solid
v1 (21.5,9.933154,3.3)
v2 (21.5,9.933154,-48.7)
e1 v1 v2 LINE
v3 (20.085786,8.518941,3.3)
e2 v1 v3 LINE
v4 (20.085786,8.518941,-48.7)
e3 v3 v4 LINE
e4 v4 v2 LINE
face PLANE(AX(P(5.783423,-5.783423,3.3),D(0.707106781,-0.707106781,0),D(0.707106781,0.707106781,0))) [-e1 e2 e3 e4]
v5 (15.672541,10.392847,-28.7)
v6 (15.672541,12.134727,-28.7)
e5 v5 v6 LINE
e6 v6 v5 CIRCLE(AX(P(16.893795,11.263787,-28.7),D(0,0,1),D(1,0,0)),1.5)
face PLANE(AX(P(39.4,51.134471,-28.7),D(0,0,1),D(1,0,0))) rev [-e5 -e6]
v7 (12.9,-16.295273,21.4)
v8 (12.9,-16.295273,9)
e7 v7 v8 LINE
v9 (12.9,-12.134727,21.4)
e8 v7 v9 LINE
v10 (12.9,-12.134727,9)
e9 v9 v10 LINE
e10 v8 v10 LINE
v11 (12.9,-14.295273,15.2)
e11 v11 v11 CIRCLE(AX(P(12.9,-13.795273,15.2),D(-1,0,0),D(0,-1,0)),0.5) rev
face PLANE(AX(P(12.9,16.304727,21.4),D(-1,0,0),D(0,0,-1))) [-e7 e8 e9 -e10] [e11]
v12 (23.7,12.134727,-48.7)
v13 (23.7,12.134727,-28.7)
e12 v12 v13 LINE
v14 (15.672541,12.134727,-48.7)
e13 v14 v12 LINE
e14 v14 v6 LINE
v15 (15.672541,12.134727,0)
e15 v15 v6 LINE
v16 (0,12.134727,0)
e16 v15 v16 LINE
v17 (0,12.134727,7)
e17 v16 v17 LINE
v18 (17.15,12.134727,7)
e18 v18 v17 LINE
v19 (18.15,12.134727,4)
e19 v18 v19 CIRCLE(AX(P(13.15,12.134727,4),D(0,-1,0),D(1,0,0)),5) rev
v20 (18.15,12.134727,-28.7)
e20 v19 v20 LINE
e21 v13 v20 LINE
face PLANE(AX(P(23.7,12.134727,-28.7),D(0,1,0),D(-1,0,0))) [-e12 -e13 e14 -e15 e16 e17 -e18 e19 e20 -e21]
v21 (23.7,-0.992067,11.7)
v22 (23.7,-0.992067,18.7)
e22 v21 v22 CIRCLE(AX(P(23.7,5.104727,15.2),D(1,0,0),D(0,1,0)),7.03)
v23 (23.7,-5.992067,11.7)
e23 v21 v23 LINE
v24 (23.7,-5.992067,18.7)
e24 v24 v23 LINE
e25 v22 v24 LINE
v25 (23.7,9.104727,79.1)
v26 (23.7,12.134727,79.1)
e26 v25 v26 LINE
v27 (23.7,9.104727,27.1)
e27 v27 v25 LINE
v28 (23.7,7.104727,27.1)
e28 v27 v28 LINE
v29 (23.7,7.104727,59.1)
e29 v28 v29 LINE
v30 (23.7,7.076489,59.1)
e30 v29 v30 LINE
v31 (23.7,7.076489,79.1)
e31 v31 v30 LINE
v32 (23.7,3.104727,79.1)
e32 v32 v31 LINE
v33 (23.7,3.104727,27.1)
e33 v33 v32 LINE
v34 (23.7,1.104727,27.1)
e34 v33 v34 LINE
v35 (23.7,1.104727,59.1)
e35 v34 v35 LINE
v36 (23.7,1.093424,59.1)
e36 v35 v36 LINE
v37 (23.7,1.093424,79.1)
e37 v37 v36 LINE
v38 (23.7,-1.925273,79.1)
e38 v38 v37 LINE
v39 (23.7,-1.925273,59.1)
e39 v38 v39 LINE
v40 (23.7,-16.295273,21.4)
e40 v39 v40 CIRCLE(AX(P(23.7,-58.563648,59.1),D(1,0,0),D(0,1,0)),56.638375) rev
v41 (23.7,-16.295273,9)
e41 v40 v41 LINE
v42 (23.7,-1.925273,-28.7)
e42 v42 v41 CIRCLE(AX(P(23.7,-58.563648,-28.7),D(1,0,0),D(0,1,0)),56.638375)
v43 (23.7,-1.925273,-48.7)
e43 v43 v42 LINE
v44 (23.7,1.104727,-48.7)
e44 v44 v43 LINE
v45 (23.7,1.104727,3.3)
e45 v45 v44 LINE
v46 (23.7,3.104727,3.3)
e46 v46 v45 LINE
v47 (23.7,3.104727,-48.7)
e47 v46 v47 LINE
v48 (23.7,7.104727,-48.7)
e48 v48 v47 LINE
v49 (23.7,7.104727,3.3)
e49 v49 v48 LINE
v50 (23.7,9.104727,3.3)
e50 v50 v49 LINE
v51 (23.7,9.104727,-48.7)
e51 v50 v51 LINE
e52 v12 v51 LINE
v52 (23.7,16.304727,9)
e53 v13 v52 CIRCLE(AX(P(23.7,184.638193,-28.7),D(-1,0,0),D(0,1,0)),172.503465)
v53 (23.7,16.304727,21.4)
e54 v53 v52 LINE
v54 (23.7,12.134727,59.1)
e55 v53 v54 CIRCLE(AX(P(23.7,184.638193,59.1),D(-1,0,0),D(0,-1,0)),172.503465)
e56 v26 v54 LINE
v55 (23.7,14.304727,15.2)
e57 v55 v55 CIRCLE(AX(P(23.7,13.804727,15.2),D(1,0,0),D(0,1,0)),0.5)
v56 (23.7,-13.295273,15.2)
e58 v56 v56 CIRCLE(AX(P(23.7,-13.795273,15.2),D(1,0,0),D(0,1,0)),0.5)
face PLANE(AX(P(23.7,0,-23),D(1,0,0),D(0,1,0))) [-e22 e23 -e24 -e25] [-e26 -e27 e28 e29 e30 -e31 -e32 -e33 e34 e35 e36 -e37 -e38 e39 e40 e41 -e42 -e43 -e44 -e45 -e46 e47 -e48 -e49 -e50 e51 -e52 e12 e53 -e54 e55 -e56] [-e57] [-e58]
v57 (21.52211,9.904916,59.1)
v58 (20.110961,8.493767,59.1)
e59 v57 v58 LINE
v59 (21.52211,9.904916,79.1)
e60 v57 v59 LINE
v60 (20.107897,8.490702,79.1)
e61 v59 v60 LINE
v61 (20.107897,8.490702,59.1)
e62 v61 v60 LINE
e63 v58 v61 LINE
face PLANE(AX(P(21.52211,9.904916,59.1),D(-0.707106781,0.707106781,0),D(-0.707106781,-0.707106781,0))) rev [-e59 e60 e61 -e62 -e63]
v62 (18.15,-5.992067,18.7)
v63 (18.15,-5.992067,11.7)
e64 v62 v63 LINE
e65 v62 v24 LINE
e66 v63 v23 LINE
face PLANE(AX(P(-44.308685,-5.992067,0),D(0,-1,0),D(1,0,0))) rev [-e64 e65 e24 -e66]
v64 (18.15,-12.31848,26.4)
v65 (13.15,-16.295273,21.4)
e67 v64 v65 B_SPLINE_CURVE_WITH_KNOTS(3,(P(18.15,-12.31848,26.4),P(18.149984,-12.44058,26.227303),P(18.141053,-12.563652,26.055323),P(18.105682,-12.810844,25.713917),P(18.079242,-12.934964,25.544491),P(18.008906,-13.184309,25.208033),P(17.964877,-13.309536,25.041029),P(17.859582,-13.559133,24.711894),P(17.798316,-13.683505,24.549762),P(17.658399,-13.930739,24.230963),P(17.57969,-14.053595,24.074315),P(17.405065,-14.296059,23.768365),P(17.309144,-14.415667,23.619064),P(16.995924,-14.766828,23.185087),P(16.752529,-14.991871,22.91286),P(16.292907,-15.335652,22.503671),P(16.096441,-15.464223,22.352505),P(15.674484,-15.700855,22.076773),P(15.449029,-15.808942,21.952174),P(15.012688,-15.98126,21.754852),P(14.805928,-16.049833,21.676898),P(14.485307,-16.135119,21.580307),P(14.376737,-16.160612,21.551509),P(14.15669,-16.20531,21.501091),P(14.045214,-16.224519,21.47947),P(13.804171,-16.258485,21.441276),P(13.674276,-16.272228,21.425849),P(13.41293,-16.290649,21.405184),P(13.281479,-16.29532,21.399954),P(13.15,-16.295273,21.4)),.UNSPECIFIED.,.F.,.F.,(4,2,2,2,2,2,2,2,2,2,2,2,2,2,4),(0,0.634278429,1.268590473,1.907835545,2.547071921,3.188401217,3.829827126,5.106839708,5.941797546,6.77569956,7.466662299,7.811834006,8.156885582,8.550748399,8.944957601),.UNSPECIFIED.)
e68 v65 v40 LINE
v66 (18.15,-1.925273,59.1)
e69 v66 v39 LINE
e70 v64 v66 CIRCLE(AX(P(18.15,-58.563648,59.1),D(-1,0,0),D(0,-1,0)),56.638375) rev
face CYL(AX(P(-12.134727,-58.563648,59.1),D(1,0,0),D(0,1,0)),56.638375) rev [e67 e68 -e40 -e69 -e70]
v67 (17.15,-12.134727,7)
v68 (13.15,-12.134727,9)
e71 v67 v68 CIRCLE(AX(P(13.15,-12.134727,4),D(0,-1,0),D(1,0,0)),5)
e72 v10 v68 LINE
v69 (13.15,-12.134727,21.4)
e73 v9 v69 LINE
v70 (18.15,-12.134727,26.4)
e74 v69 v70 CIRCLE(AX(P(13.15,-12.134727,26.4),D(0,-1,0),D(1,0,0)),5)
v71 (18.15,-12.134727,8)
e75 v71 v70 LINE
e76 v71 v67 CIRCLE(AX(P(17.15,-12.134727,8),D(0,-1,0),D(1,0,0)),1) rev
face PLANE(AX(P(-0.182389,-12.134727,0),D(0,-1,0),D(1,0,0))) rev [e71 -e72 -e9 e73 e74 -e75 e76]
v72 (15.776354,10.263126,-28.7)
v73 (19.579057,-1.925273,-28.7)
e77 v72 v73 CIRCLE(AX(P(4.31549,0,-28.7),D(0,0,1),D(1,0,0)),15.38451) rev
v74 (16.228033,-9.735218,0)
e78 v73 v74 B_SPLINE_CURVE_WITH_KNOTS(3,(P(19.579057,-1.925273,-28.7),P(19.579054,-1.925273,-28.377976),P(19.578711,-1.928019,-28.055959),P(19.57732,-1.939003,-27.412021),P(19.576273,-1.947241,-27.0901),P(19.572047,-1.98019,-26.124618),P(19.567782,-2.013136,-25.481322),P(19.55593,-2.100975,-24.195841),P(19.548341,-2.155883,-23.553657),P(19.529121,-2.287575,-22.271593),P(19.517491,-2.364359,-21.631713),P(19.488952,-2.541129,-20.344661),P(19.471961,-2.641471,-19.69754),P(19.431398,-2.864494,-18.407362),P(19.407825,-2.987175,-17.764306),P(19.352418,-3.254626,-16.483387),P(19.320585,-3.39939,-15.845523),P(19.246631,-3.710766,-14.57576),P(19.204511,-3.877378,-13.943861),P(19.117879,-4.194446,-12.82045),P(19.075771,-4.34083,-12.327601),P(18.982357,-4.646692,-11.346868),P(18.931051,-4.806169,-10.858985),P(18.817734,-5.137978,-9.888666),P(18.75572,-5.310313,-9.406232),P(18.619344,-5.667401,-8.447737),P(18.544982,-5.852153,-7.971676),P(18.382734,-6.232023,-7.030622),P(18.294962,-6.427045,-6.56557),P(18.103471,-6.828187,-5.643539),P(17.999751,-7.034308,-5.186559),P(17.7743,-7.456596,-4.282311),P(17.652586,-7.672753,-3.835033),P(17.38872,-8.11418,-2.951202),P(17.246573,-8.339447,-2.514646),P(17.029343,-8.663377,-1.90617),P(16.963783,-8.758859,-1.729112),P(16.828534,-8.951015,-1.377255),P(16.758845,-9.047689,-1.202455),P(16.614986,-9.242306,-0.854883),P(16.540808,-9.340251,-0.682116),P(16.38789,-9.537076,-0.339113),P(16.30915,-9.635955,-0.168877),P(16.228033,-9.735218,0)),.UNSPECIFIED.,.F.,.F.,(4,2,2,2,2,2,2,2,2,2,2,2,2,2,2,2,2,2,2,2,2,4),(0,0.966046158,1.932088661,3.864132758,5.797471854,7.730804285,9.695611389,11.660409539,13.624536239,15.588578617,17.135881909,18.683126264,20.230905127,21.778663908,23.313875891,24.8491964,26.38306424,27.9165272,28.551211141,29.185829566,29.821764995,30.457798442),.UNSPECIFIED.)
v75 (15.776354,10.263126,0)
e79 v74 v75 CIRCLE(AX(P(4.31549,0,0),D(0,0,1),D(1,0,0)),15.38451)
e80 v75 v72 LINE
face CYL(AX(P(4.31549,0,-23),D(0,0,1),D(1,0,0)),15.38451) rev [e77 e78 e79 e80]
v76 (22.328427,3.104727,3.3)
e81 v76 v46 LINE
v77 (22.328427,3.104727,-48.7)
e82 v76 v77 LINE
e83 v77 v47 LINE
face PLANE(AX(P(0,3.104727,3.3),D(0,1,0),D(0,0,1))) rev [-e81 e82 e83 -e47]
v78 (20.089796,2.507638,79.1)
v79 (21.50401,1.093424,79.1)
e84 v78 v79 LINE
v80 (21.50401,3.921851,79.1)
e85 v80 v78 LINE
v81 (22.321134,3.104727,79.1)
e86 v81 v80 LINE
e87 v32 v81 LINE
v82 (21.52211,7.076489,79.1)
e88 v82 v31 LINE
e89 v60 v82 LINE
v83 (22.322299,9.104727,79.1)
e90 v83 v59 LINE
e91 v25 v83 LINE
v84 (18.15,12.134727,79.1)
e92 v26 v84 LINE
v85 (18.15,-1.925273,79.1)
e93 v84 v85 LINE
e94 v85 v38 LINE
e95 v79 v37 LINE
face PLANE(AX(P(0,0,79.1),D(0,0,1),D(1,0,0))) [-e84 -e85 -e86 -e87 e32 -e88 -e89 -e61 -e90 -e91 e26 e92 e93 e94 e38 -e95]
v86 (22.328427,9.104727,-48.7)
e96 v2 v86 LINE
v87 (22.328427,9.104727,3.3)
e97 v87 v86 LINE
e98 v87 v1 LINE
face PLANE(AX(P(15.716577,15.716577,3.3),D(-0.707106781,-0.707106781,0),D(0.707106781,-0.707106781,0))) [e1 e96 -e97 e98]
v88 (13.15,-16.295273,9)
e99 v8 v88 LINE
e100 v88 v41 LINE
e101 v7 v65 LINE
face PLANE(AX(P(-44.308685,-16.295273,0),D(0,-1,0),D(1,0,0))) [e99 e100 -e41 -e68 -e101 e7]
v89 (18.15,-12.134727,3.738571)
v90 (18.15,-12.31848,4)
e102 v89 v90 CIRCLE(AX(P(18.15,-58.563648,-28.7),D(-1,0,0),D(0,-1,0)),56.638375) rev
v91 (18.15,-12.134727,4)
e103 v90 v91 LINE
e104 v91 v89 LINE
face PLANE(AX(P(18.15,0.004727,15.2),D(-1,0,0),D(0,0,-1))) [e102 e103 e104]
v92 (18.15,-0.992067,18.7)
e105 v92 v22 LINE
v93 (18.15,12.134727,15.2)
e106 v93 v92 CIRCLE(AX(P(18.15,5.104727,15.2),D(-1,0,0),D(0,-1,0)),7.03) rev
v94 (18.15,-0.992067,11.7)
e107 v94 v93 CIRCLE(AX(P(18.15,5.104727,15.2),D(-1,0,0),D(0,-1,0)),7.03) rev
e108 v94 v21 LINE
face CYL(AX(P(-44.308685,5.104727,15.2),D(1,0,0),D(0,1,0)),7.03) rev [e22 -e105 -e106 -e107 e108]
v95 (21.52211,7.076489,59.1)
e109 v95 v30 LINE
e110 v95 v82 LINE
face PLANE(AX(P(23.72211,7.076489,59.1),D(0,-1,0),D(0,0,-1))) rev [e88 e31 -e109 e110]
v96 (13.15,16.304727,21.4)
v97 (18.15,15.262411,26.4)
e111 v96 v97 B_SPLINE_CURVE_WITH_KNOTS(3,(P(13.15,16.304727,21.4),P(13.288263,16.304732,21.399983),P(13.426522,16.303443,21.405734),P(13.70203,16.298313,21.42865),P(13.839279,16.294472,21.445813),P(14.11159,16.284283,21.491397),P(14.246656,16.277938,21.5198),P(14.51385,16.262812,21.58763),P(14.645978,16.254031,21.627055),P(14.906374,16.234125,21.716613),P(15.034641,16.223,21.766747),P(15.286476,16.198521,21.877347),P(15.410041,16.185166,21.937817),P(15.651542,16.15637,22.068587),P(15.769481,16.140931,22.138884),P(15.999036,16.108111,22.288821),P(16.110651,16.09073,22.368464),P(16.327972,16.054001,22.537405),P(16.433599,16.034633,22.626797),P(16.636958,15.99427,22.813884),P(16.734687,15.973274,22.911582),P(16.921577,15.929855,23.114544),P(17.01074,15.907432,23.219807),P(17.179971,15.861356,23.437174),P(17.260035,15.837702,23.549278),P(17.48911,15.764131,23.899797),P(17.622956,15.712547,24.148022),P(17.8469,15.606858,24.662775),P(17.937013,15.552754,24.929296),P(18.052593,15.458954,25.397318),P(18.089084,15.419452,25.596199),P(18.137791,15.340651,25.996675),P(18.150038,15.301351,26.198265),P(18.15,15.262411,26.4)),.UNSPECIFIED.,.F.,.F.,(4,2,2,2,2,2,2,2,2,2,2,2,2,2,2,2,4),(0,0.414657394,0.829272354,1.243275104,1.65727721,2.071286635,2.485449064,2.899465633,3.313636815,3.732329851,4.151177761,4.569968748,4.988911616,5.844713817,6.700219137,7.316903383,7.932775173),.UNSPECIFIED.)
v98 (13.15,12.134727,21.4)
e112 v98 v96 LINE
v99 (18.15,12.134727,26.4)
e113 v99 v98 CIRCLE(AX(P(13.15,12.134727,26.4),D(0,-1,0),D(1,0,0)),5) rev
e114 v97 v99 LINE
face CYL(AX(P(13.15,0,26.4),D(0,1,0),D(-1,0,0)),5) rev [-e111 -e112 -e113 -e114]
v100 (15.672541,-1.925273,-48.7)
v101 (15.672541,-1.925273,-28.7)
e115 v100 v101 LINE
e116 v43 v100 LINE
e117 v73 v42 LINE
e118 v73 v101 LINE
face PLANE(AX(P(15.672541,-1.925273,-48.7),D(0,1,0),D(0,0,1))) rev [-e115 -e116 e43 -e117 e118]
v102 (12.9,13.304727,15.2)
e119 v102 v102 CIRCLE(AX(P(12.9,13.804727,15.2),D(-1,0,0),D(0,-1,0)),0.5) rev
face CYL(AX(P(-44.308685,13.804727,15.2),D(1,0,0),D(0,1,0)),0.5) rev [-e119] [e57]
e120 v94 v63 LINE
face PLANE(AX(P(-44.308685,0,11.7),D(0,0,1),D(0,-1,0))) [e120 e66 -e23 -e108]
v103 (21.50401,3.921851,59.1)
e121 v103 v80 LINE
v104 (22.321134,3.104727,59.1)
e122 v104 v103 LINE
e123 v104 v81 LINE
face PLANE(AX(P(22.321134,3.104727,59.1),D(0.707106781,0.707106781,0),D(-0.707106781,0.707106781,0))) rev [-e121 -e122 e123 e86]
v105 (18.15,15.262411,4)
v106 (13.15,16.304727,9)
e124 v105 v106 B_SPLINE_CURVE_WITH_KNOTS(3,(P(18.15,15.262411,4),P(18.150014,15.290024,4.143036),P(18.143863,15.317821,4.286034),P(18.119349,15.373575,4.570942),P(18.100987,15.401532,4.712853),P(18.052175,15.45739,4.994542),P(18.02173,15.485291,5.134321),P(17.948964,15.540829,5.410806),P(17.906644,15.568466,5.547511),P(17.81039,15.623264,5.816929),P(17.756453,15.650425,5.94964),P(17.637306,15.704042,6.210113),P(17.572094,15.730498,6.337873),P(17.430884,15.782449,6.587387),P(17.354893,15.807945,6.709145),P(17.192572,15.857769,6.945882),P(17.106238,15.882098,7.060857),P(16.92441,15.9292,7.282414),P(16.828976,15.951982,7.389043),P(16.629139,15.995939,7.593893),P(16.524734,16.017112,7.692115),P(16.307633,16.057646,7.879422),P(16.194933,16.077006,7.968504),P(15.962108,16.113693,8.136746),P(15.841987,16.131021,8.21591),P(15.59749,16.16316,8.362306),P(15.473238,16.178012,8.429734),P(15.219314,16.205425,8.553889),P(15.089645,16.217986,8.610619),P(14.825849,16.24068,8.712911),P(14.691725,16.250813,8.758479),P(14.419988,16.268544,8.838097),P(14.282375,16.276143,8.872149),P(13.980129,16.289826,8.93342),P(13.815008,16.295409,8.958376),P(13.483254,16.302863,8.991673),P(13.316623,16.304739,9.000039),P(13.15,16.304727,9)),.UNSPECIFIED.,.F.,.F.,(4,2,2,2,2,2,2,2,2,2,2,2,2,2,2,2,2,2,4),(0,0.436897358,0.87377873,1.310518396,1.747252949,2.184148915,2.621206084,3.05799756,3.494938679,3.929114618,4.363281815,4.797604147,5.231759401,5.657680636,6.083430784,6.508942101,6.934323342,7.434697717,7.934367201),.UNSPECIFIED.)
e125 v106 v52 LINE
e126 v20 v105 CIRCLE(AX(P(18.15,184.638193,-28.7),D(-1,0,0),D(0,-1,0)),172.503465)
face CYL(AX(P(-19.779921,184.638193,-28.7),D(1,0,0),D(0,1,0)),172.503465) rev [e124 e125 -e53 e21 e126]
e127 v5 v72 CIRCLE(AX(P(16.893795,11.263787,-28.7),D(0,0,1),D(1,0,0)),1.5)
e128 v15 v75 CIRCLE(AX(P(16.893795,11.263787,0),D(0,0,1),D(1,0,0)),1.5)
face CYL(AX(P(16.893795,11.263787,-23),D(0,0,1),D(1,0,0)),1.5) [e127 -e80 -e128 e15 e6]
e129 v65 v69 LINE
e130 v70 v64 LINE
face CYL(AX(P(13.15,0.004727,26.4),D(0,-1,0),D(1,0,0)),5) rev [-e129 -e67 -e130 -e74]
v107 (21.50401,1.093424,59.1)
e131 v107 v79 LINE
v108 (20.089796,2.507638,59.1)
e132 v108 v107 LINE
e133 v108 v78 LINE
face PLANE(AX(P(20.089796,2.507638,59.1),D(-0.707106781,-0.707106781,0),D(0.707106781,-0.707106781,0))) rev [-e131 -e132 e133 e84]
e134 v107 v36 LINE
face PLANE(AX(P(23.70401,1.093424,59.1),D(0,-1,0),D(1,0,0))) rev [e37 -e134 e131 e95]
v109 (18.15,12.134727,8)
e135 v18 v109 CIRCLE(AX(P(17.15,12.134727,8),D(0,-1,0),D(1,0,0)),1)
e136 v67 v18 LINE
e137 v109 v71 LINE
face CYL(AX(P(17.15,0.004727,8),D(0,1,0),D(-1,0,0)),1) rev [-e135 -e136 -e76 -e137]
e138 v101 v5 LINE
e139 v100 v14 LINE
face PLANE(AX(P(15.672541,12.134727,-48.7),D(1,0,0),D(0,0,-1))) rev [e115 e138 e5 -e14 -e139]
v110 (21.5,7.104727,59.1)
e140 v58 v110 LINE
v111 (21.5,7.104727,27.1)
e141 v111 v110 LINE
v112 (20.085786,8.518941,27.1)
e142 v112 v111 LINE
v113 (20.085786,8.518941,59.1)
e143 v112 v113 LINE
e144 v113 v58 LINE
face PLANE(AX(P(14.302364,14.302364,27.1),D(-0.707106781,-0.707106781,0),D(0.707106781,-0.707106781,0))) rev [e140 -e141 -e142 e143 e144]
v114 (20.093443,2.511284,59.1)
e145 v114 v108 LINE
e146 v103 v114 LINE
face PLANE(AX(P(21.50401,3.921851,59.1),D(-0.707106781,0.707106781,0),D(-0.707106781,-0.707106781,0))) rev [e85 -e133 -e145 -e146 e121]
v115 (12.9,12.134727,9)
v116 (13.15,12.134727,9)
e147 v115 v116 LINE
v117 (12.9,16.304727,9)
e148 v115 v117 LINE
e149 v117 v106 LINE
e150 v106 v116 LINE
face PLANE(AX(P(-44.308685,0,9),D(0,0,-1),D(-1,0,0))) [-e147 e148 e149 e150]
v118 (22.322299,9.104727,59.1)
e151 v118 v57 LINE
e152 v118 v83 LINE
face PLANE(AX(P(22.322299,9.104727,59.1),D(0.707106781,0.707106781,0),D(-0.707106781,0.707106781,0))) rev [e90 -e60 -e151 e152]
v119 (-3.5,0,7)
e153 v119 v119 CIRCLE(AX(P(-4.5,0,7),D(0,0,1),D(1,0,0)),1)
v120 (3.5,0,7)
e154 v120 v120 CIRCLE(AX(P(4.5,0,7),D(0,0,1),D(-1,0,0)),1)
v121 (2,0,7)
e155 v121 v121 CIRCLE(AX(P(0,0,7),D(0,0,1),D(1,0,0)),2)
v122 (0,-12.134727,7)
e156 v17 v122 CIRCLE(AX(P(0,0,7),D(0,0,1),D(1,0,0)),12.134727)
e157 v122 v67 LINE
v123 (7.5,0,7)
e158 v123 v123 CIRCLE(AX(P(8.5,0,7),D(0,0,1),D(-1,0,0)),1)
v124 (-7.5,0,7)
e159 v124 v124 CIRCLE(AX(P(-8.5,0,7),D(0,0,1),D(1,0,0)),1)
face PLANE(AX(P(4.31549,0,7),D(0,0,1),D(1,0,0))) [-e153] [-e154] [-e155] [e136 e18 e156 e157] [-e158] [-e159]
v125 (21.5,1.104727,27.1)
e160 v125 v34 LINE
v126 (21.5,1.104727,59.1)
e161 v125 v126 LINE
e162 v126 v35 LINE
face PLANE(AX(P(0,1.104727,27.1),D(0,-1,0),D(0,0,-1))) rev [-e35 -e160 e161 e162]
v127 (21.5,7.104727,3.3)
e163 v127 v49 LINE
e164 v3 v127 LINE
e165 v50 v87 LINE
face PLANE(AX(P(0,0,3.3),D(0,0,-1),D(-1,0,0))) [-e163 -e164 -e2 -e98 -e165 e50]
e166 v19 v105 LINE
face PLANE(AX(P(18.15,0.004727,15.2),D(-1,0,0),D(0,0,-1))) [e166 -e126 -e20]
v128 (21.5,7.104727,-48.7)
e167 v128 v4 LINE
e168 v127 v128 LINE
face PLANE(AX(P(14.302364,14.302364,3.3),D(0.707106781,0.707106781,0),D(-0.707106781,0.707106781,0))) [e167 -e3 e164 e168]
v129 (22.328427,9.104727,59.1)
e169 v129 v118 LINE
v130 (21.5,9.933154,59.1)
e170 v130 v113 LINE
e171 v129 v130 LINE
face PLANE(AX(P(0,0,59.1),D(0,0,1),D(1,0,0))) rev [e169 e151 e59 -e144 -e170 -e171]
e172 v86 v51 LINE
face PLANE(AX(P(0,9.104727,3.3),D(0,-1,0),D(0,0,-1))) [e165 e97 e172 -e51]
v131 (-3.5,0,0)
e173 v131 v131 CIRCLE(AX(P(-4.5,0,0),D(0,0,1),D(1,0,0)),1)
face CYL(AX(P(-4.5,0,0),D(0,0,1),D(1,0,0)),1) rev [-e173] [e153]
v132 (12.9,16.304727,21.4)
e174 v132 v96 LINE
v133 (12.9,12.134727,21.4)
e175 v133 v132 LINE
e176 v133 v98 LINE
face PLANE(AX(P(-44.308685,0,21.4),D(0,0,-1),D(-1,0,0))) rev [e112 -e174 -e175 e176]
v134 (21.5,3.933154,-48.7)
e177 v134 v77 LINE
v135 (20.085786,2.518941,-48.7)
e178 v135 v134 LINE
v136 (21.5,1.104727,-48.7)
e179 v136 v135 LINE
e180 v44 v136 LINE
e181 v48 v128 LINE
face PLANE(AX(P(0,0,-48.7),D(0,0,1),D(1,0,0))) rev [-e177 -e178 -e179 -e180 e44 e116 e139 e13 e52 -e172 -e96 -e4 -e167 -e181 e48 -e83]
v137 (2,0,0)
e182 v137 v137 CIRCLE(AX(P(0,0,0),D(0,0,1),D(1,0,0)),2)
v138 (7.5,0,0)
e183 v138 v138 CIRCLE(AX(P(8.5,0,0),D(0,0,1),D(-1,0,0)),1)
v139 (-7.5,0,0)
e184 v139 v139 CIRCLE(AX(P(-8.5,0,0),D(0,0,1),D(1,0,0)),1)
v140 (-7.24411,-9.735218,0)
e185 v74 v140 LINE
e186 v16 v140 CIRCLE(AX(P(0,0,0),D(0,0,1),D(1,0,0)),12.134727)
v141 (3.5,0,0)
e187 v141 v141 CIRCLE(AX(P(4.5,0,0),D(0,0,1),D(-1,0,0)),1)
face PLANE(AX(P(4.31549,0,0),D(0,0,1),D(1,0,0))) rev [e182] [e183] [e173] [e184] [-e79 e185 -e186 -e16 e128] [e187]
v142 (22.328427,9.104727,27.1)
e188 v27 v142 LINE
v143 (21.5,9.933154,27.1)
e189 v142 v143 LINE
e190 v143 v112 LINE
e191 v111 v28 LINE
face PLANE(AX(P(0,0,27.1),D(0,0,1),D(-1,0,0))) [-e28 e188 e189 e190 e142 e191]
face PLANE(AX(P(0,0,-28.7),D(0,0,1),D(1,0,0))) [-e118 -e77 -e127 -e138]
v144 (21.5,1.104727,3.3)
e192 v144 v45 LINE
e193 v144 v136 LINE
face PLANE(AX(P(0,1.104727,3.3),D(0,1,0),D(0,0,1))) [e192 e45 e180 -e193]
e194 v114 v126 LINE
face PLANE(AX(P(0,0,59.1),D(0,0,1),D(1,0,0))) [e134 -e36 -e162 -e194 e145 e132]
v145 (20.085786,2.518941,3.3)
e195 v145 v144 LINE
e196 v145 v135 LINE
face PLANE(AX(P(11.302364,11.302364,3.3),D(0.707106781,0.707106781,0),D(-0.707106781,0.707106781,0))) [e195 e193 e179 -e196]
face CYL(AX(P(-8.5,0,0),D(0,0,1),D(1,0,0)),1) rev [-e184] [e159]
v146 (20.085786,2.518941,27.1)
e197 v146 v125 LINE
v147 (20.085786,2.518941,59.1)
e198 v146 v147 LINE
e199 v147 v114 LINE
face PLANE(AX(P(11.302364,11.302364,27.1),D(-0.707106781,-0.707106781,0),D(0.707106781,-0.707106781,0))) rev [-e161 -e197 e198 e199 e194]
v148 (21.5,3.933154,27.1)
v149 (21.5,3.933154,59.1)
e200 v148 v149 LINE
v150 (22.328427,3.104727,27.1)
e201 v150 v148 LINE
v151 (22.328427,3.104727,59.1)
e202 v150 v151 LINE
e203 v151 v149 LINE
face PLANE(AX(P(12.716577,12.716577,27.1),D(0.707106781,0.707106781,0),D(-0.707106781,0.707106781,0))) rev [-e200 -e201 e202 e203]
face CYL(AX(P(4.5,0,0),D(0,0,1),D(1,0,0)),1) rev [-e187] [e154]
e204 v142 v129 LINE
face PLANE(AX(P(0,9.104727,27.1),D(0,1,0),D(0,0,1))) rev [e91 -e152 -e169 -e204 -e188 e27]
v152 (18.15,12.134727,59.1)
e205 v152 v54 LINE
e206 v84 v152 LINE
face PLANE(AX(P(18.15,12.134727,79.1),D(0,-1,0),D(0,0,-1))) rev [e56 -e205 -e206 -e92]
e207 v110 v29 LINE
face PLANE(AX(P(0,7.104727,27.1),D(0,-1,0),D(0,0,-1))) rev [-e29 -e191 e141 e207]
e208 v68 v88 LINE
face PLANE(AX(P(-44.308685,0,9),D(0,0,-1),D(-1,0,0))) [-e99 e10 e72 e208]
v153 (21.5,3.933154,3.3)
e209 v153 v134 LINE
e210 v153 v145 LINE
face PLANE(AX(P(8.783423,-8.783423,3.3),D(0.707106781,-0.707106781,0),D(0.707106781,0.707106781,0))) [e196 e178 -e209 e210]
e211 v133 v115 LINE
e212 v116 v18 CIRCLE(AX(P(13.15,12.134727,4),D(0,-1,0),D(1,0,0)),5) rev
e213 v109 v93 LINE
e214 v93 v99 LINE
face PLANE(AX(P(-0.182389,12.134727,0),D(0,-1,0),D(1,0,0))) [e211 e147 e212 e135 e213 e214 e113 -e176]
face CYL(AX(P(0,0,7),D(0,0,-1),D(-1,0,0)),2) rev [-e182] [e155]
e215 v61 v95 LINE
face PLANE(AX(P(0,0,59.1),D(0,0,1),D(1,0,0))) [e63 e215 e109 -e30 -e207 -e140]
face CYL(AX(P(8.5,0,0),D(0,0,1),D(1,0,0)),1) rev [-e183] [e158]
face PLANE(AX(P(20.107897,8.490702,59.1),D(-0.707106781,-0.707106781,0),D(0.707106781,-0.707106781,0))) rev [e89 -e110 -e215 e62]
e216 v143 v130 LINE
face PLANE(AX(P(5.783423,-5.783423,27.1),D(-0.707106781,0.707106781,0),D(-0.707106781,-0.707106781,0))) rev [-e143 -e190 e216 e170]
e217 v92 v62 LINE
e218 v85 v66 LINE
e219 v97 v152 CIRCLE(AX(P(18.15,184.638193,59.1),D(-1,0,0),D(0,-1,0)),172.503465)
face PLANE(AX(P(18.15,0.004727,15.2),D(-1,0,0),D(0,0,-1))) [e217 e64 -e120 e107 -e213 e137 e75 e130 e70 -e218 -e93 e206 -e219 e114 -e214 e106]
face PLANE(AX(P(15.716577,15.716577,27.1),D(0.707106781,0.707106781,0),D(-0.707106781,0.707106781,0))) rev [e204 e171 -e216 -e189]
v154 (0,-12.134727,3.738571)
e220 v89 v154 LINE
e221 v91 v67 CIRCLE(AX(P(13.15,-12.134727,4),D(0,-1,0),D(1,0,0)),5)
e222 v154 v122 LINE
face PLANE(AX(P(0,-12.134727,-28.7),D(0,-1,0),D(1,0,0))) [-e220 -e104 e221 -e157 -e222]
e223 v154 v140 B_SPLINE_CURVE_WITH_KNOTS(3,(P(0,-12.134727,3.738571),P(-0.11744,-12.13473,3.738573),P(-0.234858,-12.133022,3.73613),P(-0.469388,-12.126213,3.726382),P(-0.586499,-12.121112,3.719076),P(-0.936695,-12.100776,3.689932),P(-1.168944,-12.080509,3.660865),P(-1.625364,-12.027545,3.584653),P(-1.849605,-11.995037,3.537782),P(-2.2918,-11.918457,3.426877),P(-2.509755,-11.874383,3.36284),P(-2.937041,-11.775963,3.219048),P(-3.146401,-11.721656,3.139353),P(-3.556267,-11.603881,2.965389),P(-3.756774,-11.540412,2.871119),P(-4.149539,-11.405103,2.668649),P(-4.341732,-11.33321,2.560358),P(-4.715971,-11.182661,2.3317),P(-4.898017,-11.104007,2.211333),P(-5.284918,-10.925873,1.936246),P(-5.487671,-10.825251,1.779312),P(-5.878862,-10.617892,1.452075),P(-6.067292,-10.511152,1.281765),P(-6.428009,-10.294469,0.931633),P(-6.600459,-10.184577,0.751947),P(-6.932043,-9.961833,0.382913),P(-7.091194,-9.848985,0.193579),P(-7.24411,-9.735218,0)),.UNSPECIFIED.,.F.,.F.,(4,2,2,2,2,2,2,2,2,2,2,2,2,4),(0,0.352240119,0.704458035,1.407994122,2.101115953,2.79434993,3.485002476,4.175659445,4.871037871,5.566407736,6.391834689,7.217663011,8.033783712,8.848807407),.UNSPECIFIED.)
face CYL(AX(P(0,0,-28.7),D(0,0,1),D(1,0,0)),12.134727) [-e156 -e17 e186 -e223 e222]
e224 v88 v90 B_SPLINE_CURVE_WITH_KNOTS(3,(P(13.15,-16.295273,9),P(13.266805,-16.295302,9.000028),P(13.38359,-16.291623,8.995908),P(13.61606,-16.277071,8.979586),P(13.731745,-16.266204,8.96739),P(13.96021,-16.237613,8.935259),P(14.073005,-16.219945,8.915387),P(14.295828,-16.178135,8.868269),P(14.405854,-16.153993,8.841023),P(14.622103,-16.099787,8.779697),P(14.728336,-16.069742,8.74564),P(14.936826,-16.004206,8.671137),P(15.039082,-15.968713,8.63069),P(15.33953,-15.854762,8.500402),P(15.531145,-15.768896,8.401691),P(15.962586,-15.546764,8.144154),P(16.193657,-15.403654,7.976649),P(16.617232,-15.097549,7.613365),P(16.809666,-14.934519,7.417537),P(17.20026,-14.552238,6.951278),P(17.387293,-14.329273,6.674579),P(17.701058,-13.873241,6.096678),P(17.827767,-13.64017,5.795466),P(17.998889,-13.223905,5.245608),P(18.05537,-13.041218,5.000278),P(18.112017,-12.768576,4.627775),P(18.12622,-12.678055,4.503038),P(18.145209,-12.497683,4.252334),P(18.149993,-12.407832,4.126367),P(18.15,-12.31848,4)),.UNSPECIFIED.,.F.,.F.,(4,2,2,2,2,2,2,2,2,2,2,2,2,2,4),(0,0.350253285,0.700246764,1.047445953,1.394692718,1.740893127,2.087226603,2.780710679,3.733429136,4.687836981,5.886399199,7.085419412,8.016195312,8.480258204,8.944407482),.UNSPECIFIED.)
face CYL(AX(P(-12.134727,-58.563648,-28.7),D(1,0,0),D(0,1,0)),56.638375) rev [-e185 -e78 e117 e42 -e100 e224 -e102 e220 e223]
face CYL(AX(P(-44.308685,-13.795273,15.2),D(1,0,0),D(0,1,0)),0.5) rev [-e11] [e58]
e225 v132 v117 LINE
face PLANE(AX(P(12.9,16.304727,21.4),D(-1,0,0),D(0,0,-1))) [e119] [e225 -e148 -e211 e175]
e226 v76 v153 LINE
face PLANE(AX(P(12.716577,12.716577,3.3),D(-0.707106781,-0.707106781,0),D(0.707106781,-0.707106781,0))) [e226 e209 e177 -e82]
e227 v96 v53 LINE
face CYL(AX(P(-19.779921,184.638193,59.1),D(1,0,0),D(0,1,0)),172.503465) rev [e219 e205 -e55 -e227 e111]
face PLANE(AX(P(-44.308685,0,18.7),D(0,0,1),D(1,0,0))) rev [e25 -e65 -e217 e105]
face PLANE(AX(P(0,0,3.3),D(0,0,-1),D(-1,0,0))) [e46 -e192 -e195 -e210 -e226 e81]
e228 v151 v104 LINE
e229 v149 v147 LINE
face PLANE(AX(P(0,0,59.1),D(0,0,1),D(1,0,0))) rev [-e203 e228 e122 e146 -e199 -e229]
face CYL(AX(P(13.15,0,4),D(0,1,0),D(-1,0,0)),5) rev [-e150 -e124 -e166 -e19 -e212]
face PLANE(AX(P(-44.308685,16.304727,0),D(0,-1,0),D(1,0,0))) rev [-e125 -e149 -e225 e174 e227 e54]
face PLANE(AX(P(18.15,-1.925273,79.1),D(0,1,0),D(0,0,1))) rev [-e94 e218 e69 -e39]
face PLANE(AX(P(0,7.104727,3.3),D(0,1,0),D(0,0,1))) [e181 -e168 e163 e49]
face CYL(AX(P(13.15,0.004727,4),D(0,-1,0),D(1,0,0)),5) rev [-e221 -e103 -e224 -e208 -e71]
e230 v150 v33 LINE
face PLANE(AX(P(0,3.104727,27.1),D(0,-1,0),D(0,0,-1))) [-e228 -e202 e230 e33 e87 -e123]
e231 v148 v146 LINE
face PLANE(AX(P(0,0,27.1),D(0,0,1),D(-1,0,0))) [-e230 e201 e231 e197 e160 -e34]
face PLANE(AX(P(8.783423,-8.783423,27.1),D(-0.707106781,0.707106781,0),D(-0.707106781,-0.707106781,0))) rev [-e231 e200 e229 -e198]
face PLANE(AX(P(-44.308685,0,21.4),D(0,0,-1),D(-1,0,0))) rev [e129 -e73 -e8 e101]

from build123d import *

# Parameters (mm, degrees)
SKETCH1_R               = 2
BOSS_EXTRUDE3_DEPTH     = 7
SKETCH3_R               = 1.0000000000000002
SKETCH3_R_2             = 0.9999999999999998
SKETCH3_R_3             = 0.9999999999999996
SKETCH3_R_4             = 0.9999999999999993
CUT_EXTRUDE2_DEPTH      = 26.09227496303999
BOSS_EXTRUDE4_START     = -7
BOSS_EXTRUDE4_DEPTH     = 7
BOSS_EXTRUDE5_START     = -30
BOSS_EXTRUDE5_DEPTH     = 30
FILLET2_R               = 1.5
CUT_EXTRUDE5_DEPTH      = 42.36510924463761
BOSS_EXTRUDE6_DEPTH     = 10.5
MOVE_START              = -28.7
MOVE_FACE1_DEPTH        = 5.7
DELETEFACE1_START       = 23.7
DELETEFACE1_OUTLINE_W   = 10.499999999999998
DELETEFACE1_OUTLINE_H   = 35.699999999999996
DELETEFACE1_DEPTH       = 15.7
SKETCH11_OUTSIDE_W      = 51.876
SKETCH11_OUTSIDE_H      = 42.462
CUT_EXTRUDE6_DEPTH      = 46.16926949380307
SERVO_START             = -12.760864102
SERVO_MICRO_OUTLINE_W   = 22.6
SERVO_MICRO_OUTLINE_H   = 12.399999999999999
SERVO_MICRO_DEPTH       = 22.3
SERVO_START_2           = 9.539135898
SERVO_MICRO_2_DEPTH     = 4.3
SERVO_START_3           = 2.889135898
SERVO_MICRO_3_DEPTH     = 2.4
SERVO_START_4           = 13.839135898
SERVO_MICRO_4_OUTLINE_R = 2.5
SERVO_MICRO_4_DEPTH     = 3.3
SERVO_START_5           = -25.667487826
SERVO_MICRO_5_OUTLINE_R = 0.6
SERVO_MICRO_5_DEPTH     = 2.3
SERVO_MICRO_6_OUTLINE_R = 0.6
SERVO_MICRO_6_DEPTH     = 2.3
SERVO_MICRO_7_OUTLINE_R = 0.6
SERVO_MICRO_7_DEPTH     = 2.3
BODY_MOVE_COPY1_ANGLE   = 90
SKETCH13_R              = 0.5000000000000009
SKETCH13_W              = 12.399999999999997
SKETCH13_H              = 4.17
SKETCH13_H_2            = 4.160545319150279
BOSS_EXTRUDE7_DEPTH     = 5.55
SKETCH13_3_W            = 12.399999999999997
SKETCH13_3_H            = 4.17
SKETCH13_3_R            = 0.5000000000000009
SKETCH13_3_H_2          = 4.160545319150279
BOSS_EXTRUDE8_DEPTH     = 10.8
CUT_EXTRUDE7_DEPTH      = 32
BOSS_EXTRUDE9_DEPTH     = 5.55
CUT_EXTRUDE8_DEPTH      = 72.0125468998838
BOSS_EXTRUDE10_DEPTH    = 5.55
FILLET8_START           = 12.13472734
FILLET8_DEPTH           = 2.98662
FILLET8_START_2         = -16.295273118
FILLET8_2_DEPTH         = 4.160545778
FILLET8_START_3         = 15.12134734
FILLET8_3_DEPTH         = 1.18338
FILLET8_START_4         = -7.24411042
FILLET8_4_DEPTH         = 25.39411042
FILLET9_R               = 1
SKETCH19_W              = 5.550000000000004
SKETCH19_H              = 14.059999999999988
BOSS_EXTRUDE11_DEPTH    = 20
CUT_EXTRUDE9_DEPTH      = 20
SKETCH21_W              = 8.027459463040207
SKETCH21_H              = 14.059999999999993
BOSS_EXTRUDE12_DEPTH    = 20
CUT_EXTRUDE10_DEPTH     = 20


with BuildPart() as part:
    # Sketch1 → Boss-Extrude3 (new body)
    with BuildSketch(Plane.XY):
        with BuildLine():
            Line((5.606455718863049, 13.824363162033857), (-15.462379801128069, 15.791841653866829))
            Line((-15.462379801128069, 15.791841653866829), (-15.46237980112806, -15.791841653866806))
            Line((-15.46237980112806, -15.791841653866806), (5.606455718863063, -13.824363162033817))
            ThreePointArc((5.606455718863063, -13.824363162033817), (18.200000000000003, 2.613e-14), (5.606455718863049, 13.824363162033857))
        make_face()
        Circle(SKETCH1_R, mode=Mode.SUBTRACT)
    extrude(amount=BOSS_EXTRUDE3_DEPTH)

    # Sketch3 → Cut-Extrude2 (cut, through all)
    with BuildSketch(Plane.XY.offset(7)):
        with Locations((-4.5, 0)):
            Circle(SKETCH3_R)
        with Locations((-8.499999999999998, 0)):
            Circle(SKETCH3_R_2)
        with Locations(Location((4.5, -1.73e-15, 0), (0, 0, 180))):
            Circle(SKETCH3_R_3)
        with Locations(Location((8.499999999999998, -1.73e-15, 0), (0, 0, 180))):
            Circle(SKETCH3_R_4)
    extrude(amount=-CUT_EXTRUDE2_DEPTH, mode=Mode.SUBTRACT)

    # Sketch6 → Boss-Extrude4 (add)
    with BuildSketch(Plane.XY.offset(7).offset(BOSS_EXTRUDE4_START)):
        with BuildLine():
            Line((12.20372638619735, 13.208287910486863), (5.606455718863047, 13.824363162033858))
            ThreePointArc((5.606455718863047, 13.82436316203386), (18.2, 2.598e-14), (5.606455718863056, -13.824363162033816))
            Line((5.606455718863056, -13.824363162033816), (12.203726386197348, -13.208287910486817))
            ThreePointArc((12.203726386197348, -13.208287910486817), (19.699999999999996, 2.132e-14), (12.20372638619735, 13.20828791048686))
        make_face()
    extrude(amount=BOSS_EXTRUDE4_DEPTH)

    # Sketch6<3> → Boss-Extrude5 (add)
    with BuildSketch(Plane.XY.offset(7).offset(BOSS_EXTRUDE5_START)):
        with BuildLine():
            Line((23.700000000000006, 12.13472734042489), (12.20372638619735, 13.208287910486863))
            ThreePointArc((12.20372638619735, 13.20828791048686), (19.699999999999996, 2.132e-14), (12.203726386197348, -13.208287910486817))
            Line((12.203726386197348, -13.208287910486817), (23.700000000000003, -12.134727340424835))
            Line((23.700000000000003, -12.134727340424835), (23.700000000000006, 12.134727340424892))
        make_face()
    extrude(amount=BOSS_EXTRUDE5_DEPTH)

    # Fillet2
    fillet2_edges = [part.edges().sort_by_distance(p)[0] for p in [
        (12.20372638619735, -13.208287910486817, -11.5),
        (12.20372638619735, 13.208287910486861, -11.5),
    ]]
    fillet(fillet2_edges, radius=FILLET2_R)

    # Sketch8 → Cut-Extrude5 (cut, through all)
    with BuildSketch(Plane.XY.offset(7)):
        with BuildLine():
            Line((-15.462379801128069, 15.791841653866829), (-15.46237980112806, -15.791841653866808))
            Line((-15.46237980112806, -15.791841653866806), (1.328273056892355, -14.223874201150027))
            ThreePointArc((1.3282730568923518, -14.22387420115002), (-14.285758873920813, 0), (1.3282730568923529, 14.22387420115002))
            Line((1.3282730568923604, 14.223874201150062), (-15.462379801128069, 15.791841653866829))
        make_face()
    extrude(amount=-CUT_EXTRUDE5_DEPTH, mode=Mode.SUBTRACT)

    # Sketch10 → Boss-Extrude6 (add)
    with BuildSketch(Plane.ZX.offset(1.6347273404248903)):
        Polygon((7, 23.700000000000003), (7, 39.40000000018666), (-28.700000000000003, 39.40000000018665), (-28.700000000000014, 23.700000000000003), align=None)
    extrude(amount=BOSS_EXTRUDE6_DEPTH)

    # Move Face1: read off the stored shape, not the designer's step
    # Move Face1 outline → Move Face1 (add)
    with BuildSketch(Plane.XY.offset(MOVE_START)):
        with BuildLine():
            Line((17.033263706, -12.757289525), (23.7, -12.13472734))
            Line((23.7, -12.13472734), (23.7, 12.13472734))
            Line((23.7, 12.13472734), (17.033263706, 12.757289525))
            ThreePointArc((17.033263706, 12.757289525), (15.554272674, 11.938827155), (15.776353621, 10.263125757))
            ThreePointArc((15.776353621, 10.263125757), (19.7, 0), (15.776353621, -10.263125757))
            ThreePointArc((15.776353621, -10.263125757), (15.554272674, -11.938827155), (17.033263706, -12.757289525))
        make_face()
    extrude(amount=MOVE_FACE1_DEPTH)

    # DeleteFace1: read off the stored shape, not the designer's step
    # DeleteFace1 outline → DeleteFace1 (cut)
    with BuildSketch(Plane.YZ.offset(DELETEFACE1_START)):
        with Locations((6.884727339999999, -10.849999999999998)):
            Rectangle(DELETEFACE1_OUTLINE_W, DELETEFACE1_OUTLINE_H)
    extrude(amount=DELETEFACE1_DEPTH, mode=Mode.SUBTRACT)

    # Sketch11 outside → Cut-Extrude6 (cut, through all)
    with BuildSketch(Plane.XY.offset(7)):
        with Locations((4.706999999999997, 0)):
            Rectangle(SKETCH11_OUTSIDE_W, SKETCH11_OUTSIDE_H)
        with BuildLine():
            Line((23.700000000000003, 12.134727340424888), (-1.43e-15, 12.134727340424885))
            ThreePointArc((-1.43e-15, 12.134727340424885), (-12.134727340424885, 1.49e-15), (0, -12.134727340424885))
            Line((0, -12.134727340424885), (23.700000000000006, -12.134727340424835))
            Line((23.700000000000006, -12.134727340424835), (23.700000000000003, 12.134727340424888))
        make_face(mode=Mode.SUBTRACT)
    extrude(amount=-CUT_EXTRUDE6_DEPTH, mode=Mode.SUBTRACT)

    # Sketch13 → Boss-Extrude7 (add)
    # profile 1 of 3: a face of its own
    with BuildSketch(Plane(origin=(23.700000000000003, -3.39e-15, 0), x_dir=(0, 0, -1), z_dir=(1, -1.4e-16, 0))):
        Polygon((-9.000000000000002, -16.295272659575108), (-9.000000000000002, -12.134727340424831), (-7, -12.134727340424831), (-6.999999999999999, 12.134727340424892), (-9.000000000000002, 12.13472734042489), (-9.000000000000002, 16.30472734042489), (-21.4, 16.30472734042489), (-21.4, 12.13472734042489), (-59.100000000000016, 12.134727340424885), (-59.100000000000016, -12.134727340424831), (-21.4, -12.134727340424831), (-21.4, -16.295272659575108), align=None)
        with Locations(Location((-15.200000000000001, 13.80472734042489, 0), (0, 0, 90))):
            Circle(SKETCH13_R, mode=Mode.SUBTRACT)
        with Locations(Location((-15.200000000000001, -13.79527265957511, 0), (0, 0, 90))):
            Circle(SKETCH13_R, mode=Mode.SUBTRACT)
        with BuildLine():
            ThreePointArc((-11.700000000000001, -0.9920668991734916), (-15.199999999999998, 12.13472734042489), (-18.700000000000003, -0.9920668991734924))
            Line((-18.700000000000003, -0.9920668991734924), (-18.700000000000003, -5.9920668991734924))
            Line((-18.700000000000003, -5.9920668991734924), (-11.700000000000003, -5.992066899173492))
            Line((-11.700000000000003, -5.992066899173492), (-11.700000000000001, -0.9920668991734916))
        make_face(mode=Mode.SUBTRACT)
    # profile 2 of 3: a face of its own
    with BuildSketch(Plane(origin=(23.700000000000003, -3.39e-15, 0), x_dir=(0, 0, -1), z_dir=(1, -1.4e-16, 0))):
        with Locations((-15.2, 14.219727340424889)):
            Rectangle(SKETCH13_W, SKETCH13_H)
        with Locations(Location((-15.200000000000001, 13.80472734042489, 0), (0, 0, 90))):
            Circle(SKETCH13_R, mode=Mode.SUBTRACT)
    # profile 3 of 3: a face of its own
    with BuildSketch(Plane(origin=(23.700000000000003, -3.39e-15, 0), x_dir=(0, 0, -1), z_dir=(1, -1.4e-16, 0))):
        with Locations((-15.2, -14.214999999999968)):
            Rectangle(SKETCH13_W, SKETCH13_H_2)
        with Locations(Location((-15.200000000000001, -13.79527265957511, 0), (0, 0, 90))):
            Circle(SKETCH13_R, mode=Mode.SUBTRACT)
    extrude(amount=-BOSS_EXTRUDE7_DEPTH)

    # Sketch13<3> → Boss-Extrude8 (add)
    # profile 1 of 2: a face of its own
    with BuildSketch(Plane(origin=(23.700000000000003, -3.39e-15, 0), x_dir=(0, 0, -1), z_dir=(1, -1.4e-16, 0))):
        with Locations((-15.2, 14.219727340424889)):
            Rectangle(SKETCH13_3_W, SKETCH13_3_H)
        with Locations(Location((-15.200000000000001, 13.80472734042489, 0), (0, 0, 90))):
            Circle(SKETCH13_3_R, mode=Mode.SUBTRACT)
    # profile 2 of 2: a face of its own
    with BuildSketch(Plane(origin=(23.700000000000003, -3.39e-15, 0), x_dir=(0, 0, -1), z_dir=(1, -1.4e-16, 0))):
        with Locations((-15.2, -14.214999999999968)):
            Rectangle(SKETCH13_3_W, SKETCH13_3_H_2)
        with Locations(Location((-15.200000000000001, -13.79527265957511, 0), (0, 0, 90))):
            Circle(SKETCH13_3_R, mode=Mode.SUBTRACT)
    extrude(amount=-BOSS_EXTRUDE8_DEPTH)

    # Sketch15 → Cut-Extrude7 (cut)
    with BuildSketch(Plane(origin=(1.903e-14, 0, -28.70000000000003), x_dir=(-1, 0, -6.6e-16), z_dir=(6.6e-16, 0, -1))):
        Polygon((-22.328427124746177, 3.104727340424887), (-23.699999999999985, 3.104727340424887), (-23.699999999999985, 1.1047273404248876), (-21.499999999999986, 1.1047273404248876), (-20.08578643762689, 2.5189409027979854), (-21.49999999999999, 3.9331544651710773), align=None)
        Polygon((-22.328427124746177, 9.104727340424887), (-23.699999999999985, 9.104727340424887), (-23.699999999999985, 7.104727340424887), (-21.499999999999986, 7.104727340424887), (-20.08578643762689, 8.518940902797986), (-21.49999999999999, 9.933154465171077), align=None)
    cut_extrude7 = extrude(amount=-CUT_EXTRUDE7_DEPTH, mode=Mode.SUBTRACT)

    # Mirror1: Cut-Extrude7 across plane
    add(cut_extrude7.mirror(Plane(origin=(0, 0, 15.200000000000001), x_dir=(1, 0, 0), z_dir=(0, 0, -1))), mode=Mode.SUBTRACT)

    # Sketch16 → Boss-Extrude9 (add)
    with BuildSketch(Plane(origin=(23.700000000000003, -3.39e-15, 0), x_dir=(0, 0, -1), z_dir=(1, -1.4e-16, 0))):
        with BuildLine():
            Line((-21.4, 12.13472734042489), (-21.4, 16.30472734042489))
            ThreePointArc((-21.4, 16.30472734042489), (-40.135039546574305, 13.18039662240372), (-59.100000000000016, 12.134727340424885))
            Line((-59.100000000000016, 12.134727340424885), (-21.4, 12.13472734042489))
        make_face()
        with BuildLine():
            Line((-9.000000000000002, 16.30472734042489), (-9.000000000000002, 12.13472734042489))
            Line((-9.000000000000002, 12.13472734042489), (28.700000000000014, 12.134727340424892))
            ThreePointArc((28.700000000000014, 12.134727340424892), (9.735039546574328, 13.180396622403777), (-9.000000000000002, 16.30472734042489))
        make_face()
    extrude(amount=-BOSS_EXTRUDE9_DEPTH)

    # Sketch18 → Cut-Extrude8 (cut, through all)
    with BuildSketch(Plane(origin=(23.700000000000003, -3.39e-15, 0), x_dir=(0, 0, -1), z_dir=(1, -1.4e-16, 0))):
        with BuildLine():
            Line((-59.100000000000016, -12.134727340424831), (-26.661429094135563, -12.134727340424831))
            ThreePointArc((-26.661429094135563, -12.134727340424838), (-42.096369157624615, -4.537893974213425), (-59.100000000000016, -1.9252726595751))
            Line((-59.100000000000016, -1.9252726595751037), (-59.100000000000016, -12.134727340424831))
        make_face()
        with BuildLine():
            Line((-3.7385709058644423, -12.134727340424831), (28.700000000000003, -12.134727340424831))
            Line((28.700000000000003, -12.134727340424831), (28.700000000000003, -1.9252726595751037))
            ThreePointArc((28.700000000000003, -1.9252726595751), (11.69636915762461, -4.537893974213425), (-3.738570905864435, -12.134727340424838))
        make_face()
    extrude(amount=-CUT_EXTRUDE8_DEPTH, mode=Mode.SUBTRACT)

    # Sketch18<3> → Boss-Extrude10 (add)
    with BuildSketch(Plane(origin=(23.700000000000003, -3.39e-15, 0), x_dir=(0, 0, -1), z_dir=(1, -1.4e-16, 0))):
        with BuildLine():
            ThreePointArc((-26.661429094135563, -12.134727340424838), (-23.96906894889605, -14.137042924937433), (-21.4, -16.295272659575097))
            Line((-21.4, -16.295272659575108), (-21.4, -12.134727340424831))
            Line((-21.4, -12.134727340424831), (-26.66142909413556, -12.134727340424831))
        make_face()
        with BuildLine():
            ThreePointArc((-9, -16.295272659575097), (-6.430931051103947, -14.137042924937433), (-3.738570905864435, -12.134727340424838))
            Line((-3.7385709058644423, -12.134727340424831), (-9.000000000000005, -12.134727340424831))
            Line((-9.000000000000005, -12.134727340424831), (-9.000000000000005, -16.295272659575108))
        make_face()
    extrude(amount=-BOSS_EXTRUDE10_DEPTH)

    # Fillet8: read off the stored shape, not the designer's step
    # Fillet8 outline → Fillet8 (add)
    with BuildSketch(Plane(origin=(0, 0, 0), x_dir=(1, 0, 0), z_dir=(0, 1, 0)).offset(FILLET8_START)):
        with BuildLine():
            Line((13.15, -9), (18.15, -9))
            Line((18.15, -9), (18.15, -4))
            ThreePointArc((18.15, -4), (16.685533906, -7.535533906), (13.15, -9))
        make_face()
        with BuildLine():
            ThreePointArc((13.15, -21.4), (16.685533906, -22.864466094), (18.15, -26.4))
            Line((18.15, -26.4), (18.15, -21.4))
            Line((18.15, -21.4), (13.15, -21.4))
        make_face()
    extrude(amount=FILLET8_DEPTH)

    # Fillet8 2 outline → Fillet8 2 (add)
    with BuildSketch(Plane(origin=(0, 0, 0), x_dir=(1, 0, 0), z_dir=(0, 1, 0)).offset(FILLET8_START_2)):
        with BuildLine():
            Line((13.15, -9), (18.15, -9))
            Line((18.15, -9), (18.15, -4))
            ThreePointArc((18.15, -4), (16.685533906, -7.535533906), (13.15, -9))
        make_face()
        with BuildLine():
            ThreePointArc((13.15, -21.4), (16.685533906, -22.864466094), (18.15, -26.4))
            Line((18.15, -26.4), (18.15, -21.4))
            Line((18.15, -21.4), (13.15, -21.4))
        make_face()
    extrude(amount=FILLET8_2_DEPTH)

    # Fillet8 3 outline → Fillet8 3 (add)
    with BuildSketch(Plane(origin=(0, 0, 0), x_dir=(1, 0, 0), z_dir=(0, 1, 0)).offset(FILLET8_START_3)):
        with BuildLine():
            Line((13.15, -9), (18.15, -9))
            Line((18.15, -9), (18.15, -4))
            ThreePointArc((18.15, -4), (16.685533906, -7.535533906), (13.15, -9))
        make_face()
        with BuildLine():
            ThreePointArc((13.15, -21.4), (16.685533906, -22.864466094), (18.15, -26.4))
            Line((18.15, -26.4), (18.15, -21.4))
            Line((18.15, -21.4), (13.15, -21.4))
        make_face()
    extrude(amount=FILLET8_3_DEPTH)

    # Fillet8 4 outline → Fillet8 4 (cut)
    with BuildSketch(Plane.YZ.offset(FILLET8_START_4)):
        with BuildLine():
            ThreePointArc((-12.31848008, 4), (-14.236321945, 6.556116062), (-16.29527266, 9))
            Line((-16.29527266, 9), (-16.295273118, 4))
            Line((-16.295273118, 4), (-12.31848008, 4))
        make_face()
        with BuildLine():
            Line((16.30472734, 4), (16.30472734, 9))
            ThreePointArc((16.30472734, 9), (15.765062943, 6.503857829), (15.262410605, 4))
            Line((15.262410605, 4), (16.30472734, 4))
        make_face()
        with BuildLine():
            Line((-12.31848008, 26.4), (-16.295273118, 26.4))
            Line((-16.295273118, 26.4), (-16.29527266, 21.4))
            ThreePointArc((-16.29527266, 21.4), (-14.236321945, 23.843883938), (-12.31848008, 26.4))
        make_face()
        with BuildLine():
            Line((16.30472734, 26.4), (15.262410605, 26.4))
            ThreePointArc((15.262410605, 26.4), (15.765062943, 23.896142171), (16.30472734, 21.4))
            Line((16.30472734, 21.4), (16.30472734, 26.4))
        make_face()
    extrude(amount=FILLET8_4_DEPTH, mode=Mode.SUBTRACT)

    # Fillet9
    fillet9_edges = [part.edges().sort_by_distance(p)[0] for p in [
        (18.150000000000002, 2.76e-14, 7),
    ]]
    fillet(fillet9_edges, radius=FILLET9_R)

    # Sketch19 → Boss-Extrude11 (add)
    with BuildSketch(Plane.XY.offset(59.100000000000016)):
        with Locations((20.925, 5.104727340424887)):
            Rectangle(SKETCH19_W, SKETCH19_H)
    extrude(amount=BOSS_EXTRUDE11_DEPTH)

    # Sketch20 → Cut-Extrude9 (cut)
    with BuildSketch(Plane.XY.offset(79.10000000000002)):
        Polygon((23.722110207744855, 7.076488781049606), (23.722110207744855, 9.104727340424887), (22.32229877311573, 9.104727340424887), (21.522110207744838, 9.904915905795775), (20.107896645371763, 8.490702343422699), (21.522110207744856, 7.076488781049606), align=None)
        Polygon((23.70401004449683, 1.0934240658721006), (23.70401004449683, 3.104727340424886), (22.3211338946902, 3.104727340424886), (21.504010044496816, 3.92185119061827), (20.08979648212374, 2.507637628245194), (21.504010044496834, 1.0934240658721002), align=None)
    extrude(amount=-CUT_EXTRUDE9_DEPTH, mode=Mode.SUBTRACT)

    # Sketch21 → Boss-Extrude12 (add)
    with BuildSketch(Plane(origin=(1.903e-14, 0, -28.70000000000003), x_dir=(-1, 0, -6.6e-16), z_dir=(6.6e-16, 0, -1))):
        with Locations((-19.68627026847988, 5.10472734042489)):
            Rectangle(SKETCH21_W, SKETCH21_H)
    extrude(amount=BOSS_EXTRUDE12_DEPTH)

    # Sketch24 → Cut-Extrude10 (cut)
    with BuildSketch(Plane(origin=(4.21e-14, 0, -48.70000000000004), x_dir=(-1, 0, -8.6e-16), z_dir=(8.6e-16, 0, -1))):
        Polygon((-23.699999999999978, 9.104727340424887), (-22.32842712474612, 9.104727340424887), (-21.499999999999954, 9.933154465171054), (-20.085786437626883, 8.518940902797985), (-21.499999999999982, 7.104727340424887), (-23.699999999999978, 7.104727340424887), align=None)
        Polygon((-23.699999999999978, 3.104727340424887), (-22.32842712474617, 3.104727340424887), (-21.499999999999982, 3.9331544651710755), (-20.085786437626886, 2.518940902797982), (-21.499999999999982, 1.1047273404248876), (-23.699999999999978, 1.1047273404248874), align=None)
    extrude(amount=-CUT_EXTRUDE10_DEPTH, mode=Mode.SUBTRACT)


with BuildPart() as body_2:
    # Servo Micro: read off the stored shape, not the designer's step
    # Servo Micro outline → Servo Micro (new body)
    with BuildSketch(Plane(origin=(0, 0, 0), x_dir=(1, 0, 0), z_dir=(0, 1, 0)).offset(SERVO_START)):
        with Locations((-12.067487826, -26.388081974)):
            Rectangle(SERVO_MICRO_OUTLINE_W, SERVO_MICRO_OUTLINE_H)
    extrude(amount=SERVO_MICRO_DEPTH)

    # Servo Micro 2 outline → Servo Micro 2 (add)
    with BuildSketch(Plane(origin=(0, 0, 0), x_dir=(1, 0, 0), z_dir=(0, 1, 0)).offset(SERVO_START_2)):
        with BuildLine():
            ThreePointArc((-11.10082116, -25.109193568), (-23.367487826, -26.388081974), (-11.10082116, -27.666970381))
            ThreePointArc((-11.10082116, -27.666970381), (-9.567487826, -26.388081975), (-11.10082116, -25.109193568))
        make_face()
    extrude(amount=SERVO_MICRO_2_DEPTH)

    # Servo Micro 3 outline → Servo Micro 3 (add)
    with BuildSketch(Plane(origin=(0, 0, 0), x_dir=(1, 0, 0), z_dir=(0, 1, 0)).offset(SERVO_START_3)):
        with BuildLine():
            Line((2.567676828, -25.838081974), (4.232512174, -25.838081974))
            Line((4.232512174, -25.838081974), (4.232512174, -20.188081974))
            Line((4.232512174, -20.188081974), (-0.767487826, -20.188081974))
            Line((-0.767487826, -20.188081974), (-0.767487826, -32.588081974))
            Line((-0.767487826, -32.588081974), (4.232512174, -32.588081974))
            Line((4.232512174, -32.588081974), (4.232512174, -26.938081974))
            Line((4.232512174, -26.938081974), (2.567676828, -26.938081974))
            ThreePointArc((2.567676828, -26.938081974), (0.732512174, -26.388081974), (2.567676828, -25.838081974))
        make_face()
        with BuildLine():
            Line((-23.367487826, -32.588081974), (-23.367487826, -20.188081974))
            Line((-23.367487826, -20.188081974), (-28.367487826, -20.188081974))
            Line((-28.367487826, -20.188081974), (-28.367487826, -25.838081974))
            Line((-28.367487826, -25.838081974), (-26.702652481, -25.838081974))
            ThreePointArc((-26.702652481, -25.838081974), (-24.867487826, -26.388081974), (-26.702652481, -26.938081974))
            Line((-26.702652481, -26.938081974), (-28.367487826, -26.938081974))
            Line((-28.367487826, -26.938081974), (-28.367487826, -32.588081974))
            Line((-28.367487826, -32.588081974), (-23.367487826, -32.588081974))
        make_face()
    extrude(amount=SERVO_MICRO_3_DEPTH)

    # Servo Micro 4 outline → Servo Micro 4 (add)
    with BuildSketch(Plane(origin=(0, 0, 0), x_dir=(1, 0, 0), z_dir=(0, 1, 0)).offset(SERVO_START_4)):
        with Locations((-17.167487826, -26.388081974)):
            Circle(SERVO_MICRO_4_OUTLINE_R)
    extrude(amount=SERVO_MICRO_4_DEPTH)


with BuildPart() as body_3:
    # Servo Micro 5 outline → Servo Micro 5 (new body)
    with BuildSketch(Plane.YZ.offset(SERVO_START_5)):
        with Locations((-8.260864102, 25.188081974)):
            Circle(SERVO_MICRO_5_OUTLINE_R)
    extrude(amount=SERVO_MICRO_5_DEPTH)


with BuildPart() as body_4:
    # Servo Micro 6 outline → Servo Micro 6 (new body)
    with BuildSketch(Plane.YZ.offset(SERVO_START_5)):
        with Locations((-8.260864102, 27.588081974)):
            Circle(SERVO_MICRO_6_OUTLINE_R)
    extrude(amount=SERVO_MICRO_6_DEPTH)


with BuildPart() as body_5:
    # Servo Micro 7 outline → Servo Micro 7 (new body)
    with BuildSketch(Plane.YZ.offset(SERVO_START_5)):
        with Locations((-8.260864102, 26.388081974)):
            Circle(SERVO_MICRO_7_OUTLINE_R)
    extrude(amount=SERVO_MICRO_7_DEPTH)


with BuildPart() as body_2_1:
    # Body-Move/Copy1: read off the stored shape, not the designer's step
    # Body-Move/Copy1: moved
    add(body_2.part.moved(Location((12.0627605, 7.6108641, -11.188082))).rotate(Axis((0, 0, 0), (0, 0, -1)), BODY_MOVE_COPY1_ANGLE))


solid = part.part
